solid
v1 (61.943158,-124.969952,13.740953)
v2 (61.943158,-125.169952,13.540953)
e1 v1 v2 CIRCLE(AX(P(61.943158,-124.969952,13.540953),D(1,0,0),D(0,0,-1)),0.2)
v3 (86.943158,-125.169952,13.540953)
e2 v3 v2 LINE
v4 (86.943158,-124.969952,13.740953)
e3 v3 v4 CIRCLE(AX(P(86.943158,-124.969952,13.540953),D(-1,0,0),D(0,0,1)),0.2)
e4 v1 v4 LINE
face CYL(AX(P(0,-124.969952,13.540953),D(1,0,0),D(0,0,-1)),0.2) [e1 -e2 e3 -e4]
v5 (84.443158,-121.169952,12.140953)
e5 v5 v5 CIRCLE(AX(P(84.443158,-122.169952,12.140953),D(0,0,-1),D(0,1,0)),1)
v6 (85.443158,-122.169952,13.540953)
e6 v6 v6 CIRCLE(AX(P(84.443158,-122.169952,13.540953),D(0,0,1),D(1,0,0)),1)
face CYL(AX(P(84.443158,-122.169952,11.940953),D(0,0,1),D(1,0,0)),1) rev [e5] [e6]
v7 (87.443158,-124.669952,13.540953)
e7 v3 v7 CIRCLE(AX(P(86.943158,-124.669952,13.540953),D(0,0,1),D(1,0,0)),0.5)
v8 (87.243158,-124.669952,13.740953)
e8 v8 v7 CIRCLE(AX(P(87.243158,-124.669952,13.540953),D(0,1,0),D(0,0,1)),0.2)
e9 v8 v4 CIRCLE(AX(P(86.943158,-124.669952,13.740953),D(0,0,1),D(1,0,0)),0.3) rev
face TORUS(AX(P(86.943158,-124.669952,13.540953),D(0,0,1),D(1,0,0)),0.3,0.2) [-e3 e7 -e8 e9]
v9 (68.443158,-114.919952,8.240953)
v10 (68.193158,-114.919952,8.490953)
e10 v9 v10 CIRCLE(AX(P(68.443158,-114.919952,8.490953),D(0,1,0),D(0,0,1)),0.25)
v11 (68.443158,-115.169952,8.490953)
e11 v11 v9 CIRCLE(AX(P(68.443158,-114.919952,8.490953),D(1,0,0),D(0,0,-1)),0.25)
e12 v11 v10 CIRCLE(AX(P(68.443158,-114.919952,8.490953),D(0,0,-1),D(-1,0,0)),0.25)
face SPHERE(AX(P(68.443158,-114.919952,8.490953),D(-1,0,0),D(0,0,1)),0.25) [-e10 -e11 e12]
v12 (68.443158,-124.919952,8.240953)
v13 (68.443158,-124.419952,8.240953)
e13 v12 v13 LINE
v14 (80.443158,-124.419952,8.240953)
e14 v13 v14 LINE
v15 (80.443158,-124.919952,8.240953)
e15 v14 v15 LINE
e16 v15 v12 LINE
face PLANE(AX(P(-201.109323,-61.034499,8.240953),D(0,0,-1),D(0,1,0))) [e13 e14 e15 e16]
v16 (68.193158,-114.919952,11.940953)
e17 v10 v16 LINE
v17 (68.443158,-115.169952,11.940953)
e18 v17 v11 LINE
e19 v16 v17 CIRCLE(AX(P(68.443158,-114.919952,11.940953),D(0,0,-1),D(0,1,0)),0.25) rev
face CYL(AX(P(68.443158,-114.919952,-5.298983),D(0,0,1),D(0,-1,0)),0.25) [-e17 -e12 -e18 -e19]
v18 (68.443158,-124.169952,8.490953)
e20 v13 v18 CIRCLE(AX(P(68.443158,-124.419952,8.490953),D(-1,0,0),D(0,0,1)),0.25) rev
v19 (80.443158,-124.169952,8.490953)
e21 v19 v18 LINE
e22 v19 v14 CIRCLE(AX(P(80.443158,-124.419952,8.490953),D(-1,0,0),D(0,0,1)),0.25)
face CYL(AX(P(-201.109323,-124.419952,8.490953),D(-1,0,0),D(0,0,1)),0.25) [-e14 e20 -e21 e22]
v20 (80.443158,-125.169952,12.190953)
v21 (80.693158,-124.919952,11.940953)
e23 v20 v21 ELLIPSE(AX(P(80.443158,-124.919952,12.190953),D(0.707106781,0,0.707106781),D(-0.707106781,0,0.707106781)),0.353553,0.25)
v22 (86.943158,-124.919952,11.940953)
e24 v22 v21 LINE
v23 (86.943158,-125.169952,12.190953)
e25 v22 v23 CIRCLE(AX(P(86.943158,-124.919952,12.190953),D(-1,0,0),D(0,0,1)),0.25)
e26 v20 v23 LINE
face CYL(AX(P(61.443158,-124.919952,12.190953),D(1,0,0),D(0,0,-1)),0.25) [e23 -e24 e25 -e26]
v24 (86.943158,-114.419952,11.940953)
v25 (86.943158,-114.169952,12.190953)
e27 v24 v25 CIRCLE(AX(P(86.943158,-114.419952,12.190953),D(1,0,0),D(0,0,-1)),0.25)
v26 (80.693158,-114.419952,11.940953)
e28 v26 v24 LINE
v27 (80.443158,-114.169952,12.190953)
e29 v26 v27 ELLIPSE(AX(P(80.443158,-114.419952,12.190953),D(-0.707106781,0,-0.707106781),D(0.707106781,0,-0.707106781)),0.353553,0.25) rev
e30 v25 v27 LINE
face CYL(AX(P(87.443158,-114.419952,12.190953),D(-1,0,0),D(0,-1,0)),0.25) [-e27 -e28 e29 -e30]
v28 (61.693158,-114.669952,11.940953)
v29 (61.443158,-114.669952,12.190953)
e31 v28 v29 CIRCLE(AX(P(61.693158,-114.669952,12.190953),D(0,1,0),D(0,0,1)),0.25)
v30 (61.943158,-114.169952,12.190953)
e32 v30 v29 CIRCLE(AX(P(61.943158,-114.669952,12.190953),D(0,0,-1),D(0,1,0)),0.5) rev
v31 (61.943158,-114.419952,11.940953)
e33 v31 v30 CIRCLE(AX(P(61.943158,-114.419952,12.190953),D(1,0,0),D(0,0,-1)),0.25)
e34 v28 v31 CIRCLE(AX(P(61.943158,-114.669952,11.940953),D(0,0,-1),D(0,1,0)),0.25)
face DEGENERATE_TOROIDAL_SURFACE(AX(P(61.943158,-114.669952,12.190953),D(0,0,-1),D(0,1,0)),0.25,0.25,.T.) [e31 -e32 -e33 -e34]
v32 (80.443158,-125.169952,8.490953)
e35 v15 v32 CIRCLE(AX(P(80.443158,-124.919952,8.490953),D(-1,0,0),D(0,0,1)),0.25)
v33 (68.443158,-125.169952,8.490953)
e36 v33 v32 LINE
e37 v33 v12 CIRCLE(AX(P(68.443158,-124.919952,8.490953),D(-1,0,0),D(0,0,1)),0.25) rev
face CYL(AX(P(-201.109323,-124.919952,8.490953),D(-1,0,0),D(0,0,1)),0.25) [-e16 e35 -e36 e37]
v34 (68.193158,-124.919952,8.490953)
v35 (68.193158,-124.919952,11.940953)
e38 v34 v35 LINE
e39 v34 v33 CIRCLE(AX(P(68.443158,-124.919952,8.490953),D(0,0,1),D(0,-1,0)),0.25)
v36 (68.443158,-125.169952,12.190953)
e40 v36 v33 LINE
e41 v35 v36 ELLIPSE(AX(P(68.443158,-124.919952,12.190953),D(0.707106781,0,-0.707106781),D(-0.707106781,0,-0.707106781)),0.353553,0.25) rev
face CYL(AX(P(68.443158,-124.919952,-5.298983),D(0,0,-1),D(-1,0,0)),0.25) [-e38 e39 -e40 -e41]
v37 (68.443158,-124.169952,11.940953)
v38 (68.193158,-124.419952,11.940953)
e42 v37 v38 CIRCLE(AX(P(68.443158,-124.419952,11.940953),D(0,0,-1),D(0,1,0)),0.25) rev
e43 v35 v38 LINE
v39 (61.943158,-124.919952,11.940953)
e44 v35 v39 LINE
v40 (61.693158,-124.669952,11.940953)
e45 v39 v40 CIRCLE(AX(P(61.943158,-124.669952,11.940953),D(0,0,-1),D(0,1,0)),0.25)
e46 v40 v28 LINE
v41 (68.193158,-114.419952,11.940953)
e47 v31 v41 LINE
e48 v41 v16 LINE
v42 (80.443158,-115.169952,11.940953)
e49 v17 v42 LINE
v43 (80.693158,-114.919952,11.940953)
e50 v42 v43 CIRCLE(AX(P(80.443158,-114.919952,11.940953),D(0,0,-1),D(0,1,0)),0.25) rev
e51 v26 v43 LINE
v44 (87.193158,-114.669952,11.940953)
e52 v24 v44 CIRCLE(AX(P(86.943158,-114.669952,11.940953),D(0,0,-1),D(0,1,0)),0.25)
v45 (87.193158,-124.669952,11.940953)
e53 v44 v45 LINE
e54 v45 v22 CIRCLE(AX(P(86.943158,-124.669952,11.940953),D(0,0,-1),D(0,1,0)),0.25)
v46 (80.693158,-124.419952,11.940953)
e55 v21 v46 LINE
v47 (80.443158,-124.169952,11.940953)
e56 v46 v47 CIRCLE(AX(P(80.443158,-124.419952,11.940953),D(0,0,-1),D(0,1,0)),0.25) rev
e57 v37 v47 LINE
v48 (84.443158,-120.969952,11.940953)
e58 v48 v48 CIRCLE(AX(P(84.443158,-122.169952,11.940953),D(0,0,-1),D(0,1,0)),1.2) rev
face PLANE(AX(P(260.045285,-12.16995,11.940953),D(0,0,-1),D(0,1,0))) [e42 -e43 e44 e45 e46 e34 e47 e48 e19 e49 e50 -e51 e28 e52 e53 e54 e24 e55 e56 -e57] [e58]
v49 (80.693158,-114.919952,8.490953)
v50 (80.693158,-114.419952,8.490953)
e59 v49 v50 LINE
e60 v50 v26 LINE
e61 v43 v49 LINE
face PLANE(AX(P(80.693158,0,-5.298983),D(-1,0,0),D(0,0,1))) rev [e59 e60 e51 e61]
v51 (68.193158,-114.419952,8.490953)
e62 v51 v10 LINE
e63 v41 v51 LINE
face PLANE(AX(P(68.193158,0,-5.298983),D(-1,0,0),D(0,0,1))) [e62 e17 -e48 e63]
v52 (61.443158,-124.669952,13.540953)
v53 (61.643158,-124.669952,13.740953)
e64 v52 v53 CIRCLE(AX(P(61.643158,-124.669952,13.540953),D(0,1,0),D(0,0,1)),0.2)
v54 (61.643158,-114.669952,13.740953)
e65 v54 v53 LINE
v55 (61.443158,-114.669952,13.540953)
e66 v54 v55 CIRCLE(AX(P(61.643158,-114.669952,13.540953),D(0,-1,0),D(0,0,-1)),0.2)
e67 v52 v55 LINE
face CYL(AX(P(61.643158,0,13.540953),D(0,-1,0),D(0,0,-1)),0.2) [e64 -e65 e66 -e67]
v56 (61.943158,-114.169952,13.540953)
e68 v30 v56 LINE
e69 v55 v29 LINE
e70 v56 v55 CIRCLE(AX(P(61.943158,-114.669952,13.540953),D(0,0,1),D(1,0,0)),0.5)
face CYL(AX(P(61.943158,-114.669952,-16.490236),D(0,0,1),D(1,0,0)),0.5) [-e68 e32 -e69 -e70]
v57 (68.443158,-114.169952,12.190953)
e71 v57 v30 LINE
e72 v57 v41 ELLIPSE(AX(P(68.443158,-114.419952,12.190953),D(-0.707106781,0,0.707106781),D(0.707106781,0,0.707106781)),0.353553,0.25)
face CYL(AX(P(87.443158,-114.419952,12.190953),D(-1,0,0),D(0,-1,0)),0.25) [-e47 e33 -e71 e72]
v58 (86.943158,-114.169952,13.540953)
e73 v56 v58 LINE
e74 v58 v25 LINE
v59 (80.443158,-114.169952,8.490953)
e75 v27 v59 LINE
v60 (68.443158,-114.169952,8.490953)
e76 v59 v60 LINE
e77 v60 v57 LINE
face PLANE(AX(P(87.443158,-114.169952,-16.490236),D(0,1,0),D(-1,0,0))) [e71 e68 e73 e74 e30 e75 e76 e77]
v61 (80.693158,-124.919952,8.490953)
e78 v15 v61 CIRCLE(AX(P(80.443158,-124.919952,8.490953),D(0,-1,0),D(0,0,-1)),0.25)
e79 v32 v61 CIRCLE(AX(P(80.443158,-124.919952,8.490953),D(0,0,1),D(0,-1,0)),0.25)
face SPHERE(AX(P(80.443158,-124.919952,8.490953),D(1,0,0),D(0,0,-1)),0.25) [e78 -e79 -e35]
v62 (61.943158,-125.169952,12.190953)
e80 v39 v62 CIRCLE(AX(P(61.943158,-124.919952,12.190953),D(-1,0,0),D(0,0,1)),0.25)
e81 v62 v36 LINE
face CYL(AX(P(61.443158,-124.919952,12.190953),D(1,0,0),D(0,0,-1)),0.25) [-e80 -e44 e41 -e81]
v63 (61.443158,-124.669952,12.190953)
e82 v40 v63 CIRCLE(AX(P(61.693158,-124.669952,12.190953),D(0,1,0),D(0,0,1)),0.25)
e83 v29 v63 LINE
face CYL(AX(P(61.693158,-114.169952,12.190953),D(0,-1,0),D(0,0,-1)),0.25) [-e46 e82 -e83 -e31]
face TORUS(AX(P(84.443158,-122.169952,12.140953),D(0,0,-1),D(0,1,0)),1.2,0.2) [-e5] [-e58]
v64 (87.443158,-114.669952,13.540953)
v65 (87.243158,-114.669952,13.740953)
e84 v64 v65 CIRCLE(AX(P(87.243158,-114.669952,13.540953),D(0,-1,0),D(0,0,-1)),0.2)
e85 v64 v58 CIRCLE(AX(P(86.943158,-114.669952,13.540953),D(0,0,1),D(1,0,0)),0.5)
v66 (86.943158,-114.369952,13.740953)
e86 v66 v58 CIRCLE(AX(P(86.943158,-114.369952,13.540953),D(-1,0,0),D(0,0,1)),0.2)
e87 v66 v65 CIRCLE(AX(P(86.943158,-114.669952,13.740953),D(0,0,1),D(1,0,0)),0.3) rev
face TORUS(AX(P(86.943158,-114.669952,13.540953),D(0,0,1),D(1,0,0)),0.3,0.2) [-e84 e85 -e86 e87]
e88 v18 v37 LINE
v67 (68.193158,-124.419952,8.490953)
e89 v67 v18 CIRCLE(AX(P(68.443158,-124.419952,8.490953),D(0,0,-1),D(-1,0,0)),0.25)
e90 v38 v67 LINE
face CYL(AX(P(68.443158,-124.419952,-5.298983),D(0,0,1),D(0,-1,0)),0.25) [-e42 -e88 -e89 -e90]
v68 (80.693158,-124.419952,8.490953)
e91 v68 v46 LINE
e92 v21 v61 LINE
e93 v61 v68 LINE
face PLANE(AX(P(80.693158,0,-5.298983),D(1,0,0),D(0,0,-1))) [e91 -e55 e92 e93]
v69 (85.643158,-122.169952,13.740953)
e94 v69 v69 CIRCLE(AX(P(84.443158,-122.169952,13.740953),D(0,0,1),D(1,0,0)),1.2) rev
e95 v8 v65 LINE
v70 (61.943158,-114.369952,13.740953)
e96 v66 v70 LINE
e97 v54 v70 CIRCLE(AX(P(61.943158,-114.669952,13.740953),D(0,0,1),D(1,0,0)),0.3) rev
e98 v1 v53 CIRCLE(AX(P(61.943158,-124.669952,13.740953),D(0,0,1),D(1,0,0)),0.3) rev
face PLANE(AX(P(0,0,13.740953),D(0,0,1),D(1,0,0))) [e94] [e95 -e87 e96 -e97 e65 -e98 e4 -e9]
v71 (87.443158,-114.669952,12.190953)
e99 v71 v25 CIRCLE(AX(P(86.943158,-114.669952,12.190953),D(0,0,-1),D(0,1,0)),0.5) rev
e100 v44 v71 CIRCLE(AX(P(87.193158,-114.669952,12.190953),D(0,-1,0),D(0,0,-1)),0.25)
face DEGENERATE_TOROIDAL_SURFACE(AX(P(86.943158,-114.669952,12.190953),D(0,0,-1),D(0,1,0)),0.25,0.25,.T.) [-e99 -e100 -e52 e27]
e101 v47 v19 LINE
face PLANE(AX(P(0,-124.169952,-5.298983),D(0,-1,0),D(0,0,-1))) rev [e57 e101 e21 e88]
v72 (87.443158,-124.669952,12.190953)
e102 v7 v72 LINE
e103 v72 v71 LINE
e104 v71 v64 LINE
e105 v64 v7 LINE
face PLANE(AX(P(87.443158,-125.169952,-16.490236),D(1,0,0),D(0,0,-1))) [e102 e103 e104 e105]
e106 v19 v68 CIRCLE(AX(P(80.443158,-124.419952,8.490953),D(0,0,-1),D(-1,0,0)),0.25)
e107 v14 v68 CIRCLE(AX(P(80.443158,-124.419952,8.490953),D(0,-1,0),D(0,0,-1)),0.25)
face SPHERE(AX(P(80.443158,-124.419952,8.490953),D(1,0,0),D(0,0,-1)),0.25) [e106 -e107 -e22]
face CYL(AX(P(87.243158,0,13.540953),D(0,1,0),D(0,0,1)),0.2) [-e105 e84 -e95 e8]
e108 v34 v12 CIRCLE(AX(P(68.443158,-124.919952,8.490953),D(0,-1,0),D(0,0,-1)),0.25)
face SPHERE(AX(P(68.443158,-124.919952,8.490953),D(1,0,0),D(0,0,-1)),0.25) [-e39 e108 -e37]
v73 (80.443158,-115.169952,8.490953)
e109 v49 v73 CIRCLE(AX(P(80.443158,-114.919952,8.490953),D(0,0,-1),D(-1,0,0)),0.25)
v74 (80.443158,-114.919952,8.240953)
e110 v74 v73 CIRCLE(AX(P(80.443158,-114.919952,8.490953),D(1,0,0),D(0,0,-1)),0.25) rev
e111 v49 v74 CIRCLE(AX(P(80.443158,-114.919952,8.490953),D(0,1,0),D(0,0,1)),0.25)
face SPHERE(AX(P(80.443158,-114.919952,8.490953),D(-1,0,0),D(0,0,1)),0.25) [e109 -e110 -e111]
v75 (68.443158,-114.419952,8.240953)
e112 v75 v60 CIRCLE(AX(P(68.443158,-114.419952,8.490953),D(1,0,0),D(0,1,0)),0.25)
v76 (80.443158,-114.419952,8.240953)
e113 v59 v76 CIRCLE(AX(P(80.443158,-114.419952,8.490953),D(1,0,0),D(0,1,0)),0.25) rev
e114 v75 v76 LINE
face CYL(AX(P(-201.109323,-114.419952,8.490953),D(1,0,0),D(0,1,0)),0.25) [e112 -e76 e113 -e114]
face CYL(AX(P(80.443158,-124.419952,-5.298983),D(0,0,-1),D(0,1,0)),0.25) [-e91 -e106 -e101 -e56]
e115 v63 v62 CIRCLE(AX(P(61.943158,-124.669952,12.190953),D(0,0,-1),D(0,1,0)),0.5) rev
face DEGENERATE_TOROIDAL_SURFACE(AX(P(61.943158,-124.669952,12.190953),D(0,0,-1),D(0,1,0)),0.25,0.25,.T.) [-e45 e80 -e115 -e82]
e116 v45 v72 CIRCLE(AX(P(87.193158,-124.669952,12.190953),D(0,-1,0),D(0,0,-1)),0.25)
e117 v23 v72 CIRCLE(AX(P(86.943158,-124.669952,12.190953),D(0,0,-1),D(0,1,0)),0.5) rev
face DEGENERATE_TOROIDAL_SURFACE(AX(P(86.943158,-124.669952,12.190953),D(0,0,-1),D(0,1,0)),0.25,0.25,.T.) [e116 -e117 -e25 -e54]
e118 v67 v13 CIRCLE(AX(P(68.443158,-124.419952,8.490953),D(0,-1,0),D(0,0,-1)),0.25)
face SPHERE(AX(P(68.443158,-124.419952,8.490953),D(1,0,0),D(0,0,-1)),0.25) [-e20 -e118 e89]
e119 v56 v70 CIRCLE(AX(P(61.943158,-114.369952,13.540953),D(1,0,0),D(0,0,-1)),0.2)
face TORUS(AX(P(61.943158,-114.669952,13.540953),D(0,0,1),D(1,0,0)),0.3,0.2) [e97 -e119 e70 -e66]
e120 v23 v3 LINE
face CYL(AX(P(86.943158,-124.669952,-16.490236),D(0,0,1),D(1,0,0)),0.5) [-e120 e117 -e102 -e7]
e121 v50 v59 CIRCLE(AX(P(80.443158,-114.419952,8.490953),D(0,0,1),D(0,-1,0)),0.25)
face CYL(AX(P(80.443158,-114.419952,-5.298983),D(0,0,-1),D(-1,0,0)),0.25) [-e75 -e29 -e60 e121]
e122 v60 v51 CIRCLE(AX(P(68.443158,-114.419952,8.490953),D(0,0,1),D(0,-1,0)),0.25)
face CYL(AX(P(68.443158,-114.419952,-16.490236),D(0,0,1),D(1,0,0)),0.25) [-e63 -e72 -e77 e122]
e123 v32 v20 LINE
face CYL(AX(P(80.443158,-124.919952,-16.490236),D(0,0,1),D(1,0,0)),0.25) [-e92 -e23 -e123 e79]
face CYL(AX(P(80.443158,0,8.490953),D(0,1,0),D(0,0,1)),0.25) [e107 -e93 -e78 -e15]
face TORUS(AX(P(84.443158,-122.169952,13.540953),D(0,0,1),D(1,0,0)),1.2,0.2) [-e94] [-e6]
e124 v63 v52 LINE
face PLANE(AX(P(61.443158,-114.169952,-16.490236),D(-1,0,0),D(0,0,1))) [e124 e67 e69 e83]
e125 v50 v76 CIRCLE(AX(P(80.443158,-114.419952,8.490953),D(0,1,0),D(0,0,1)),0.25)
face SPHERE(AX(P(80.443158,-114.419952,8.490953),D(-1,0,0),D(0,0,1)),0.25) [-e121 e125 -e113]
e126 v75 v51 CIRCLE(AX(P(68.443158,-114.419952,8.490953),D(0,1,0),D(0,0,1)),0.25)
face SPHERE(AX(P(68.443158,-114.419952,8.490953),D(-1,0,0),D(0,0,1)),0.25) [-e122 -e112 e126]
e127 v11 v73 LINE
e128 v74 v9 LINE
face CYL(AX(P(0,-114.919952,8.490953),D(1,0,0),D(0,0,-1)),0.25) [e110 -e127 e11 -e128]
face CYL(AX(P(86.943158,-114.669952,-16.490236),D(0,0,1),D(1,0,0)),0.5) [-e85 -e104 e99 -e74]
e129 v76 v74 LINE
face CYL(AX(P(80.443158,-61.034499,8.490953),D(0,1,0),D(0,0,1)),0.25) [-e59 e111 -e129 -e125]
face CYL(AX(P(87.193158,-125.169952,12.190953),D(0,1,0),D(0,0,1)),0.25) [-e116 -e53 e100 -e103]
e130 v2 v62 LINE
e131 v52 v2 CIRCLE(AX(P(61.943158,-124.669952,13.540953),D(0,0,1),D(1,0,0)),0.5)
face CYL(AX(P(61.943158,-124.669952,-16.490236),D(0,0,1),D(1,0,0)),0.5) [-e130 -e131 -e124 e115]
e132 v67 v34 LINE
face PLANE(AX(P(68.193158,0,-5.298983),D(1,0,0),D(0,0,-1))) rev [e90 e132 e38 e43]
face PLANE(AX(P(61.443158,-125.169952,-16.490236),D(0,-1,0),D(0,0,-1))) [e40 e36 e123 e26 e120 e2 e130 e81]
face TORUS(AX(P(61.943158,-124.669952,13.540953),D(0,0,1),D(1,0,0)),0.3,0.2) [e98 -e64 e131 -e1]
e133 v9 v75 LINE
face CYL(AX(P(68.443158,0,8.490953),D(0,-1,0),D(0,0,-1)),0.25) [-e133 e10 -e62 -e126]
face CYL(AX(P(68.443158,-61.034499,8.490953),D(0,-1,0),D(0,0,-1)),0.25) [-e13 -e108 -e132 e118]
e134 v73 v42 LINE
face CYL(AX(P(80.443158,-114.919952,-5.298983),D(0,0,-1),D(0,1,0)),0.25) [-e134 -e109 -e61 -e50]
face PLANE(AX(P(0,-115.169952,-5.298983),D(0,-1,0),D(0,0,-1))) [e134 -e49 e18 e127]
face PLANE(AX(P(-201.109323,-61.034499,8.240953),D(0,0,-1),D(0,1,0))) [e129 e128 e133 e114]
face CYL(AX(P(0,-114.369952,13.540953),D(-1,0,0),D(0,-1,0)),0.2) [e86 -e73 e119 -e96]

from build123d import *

# Parameters (mm, degrees)
SKETCH1_W           = 26
SKETCH1_H           = 11
BOSS_EXTRUDE1_DEPTH = 1.8
FILLET1_R           = 0.2
SKETCH2_R           = 1
CUT_EXTRUDE1_DEPTH  = 153.699256387
FILLET2_R           = 0.5
FILLET3_R           = 0.2
SKETCH4_W           = 12.5
SKETCH4_H           = 1
BOSS_EXTRUDE2_DEPTH = 3.7
FILLET4_R           = 0.25
FILLET5_R           = 0.25


with BuildPart() as part:
    # Sketch1 → Boss-Extrude1 (new body)
    with BuildSketch(Plane.XY.offset(13.74095281)):
        with Locations((74.443158301, -119.669952335)):
            Rectangle(SKETCH1_W, SKETCH1_H)
    extrude(amount=-BOSS_EXTRUDE1_DEPTH)

    # Fillet1
    fillet1_edges = [part.edges().sort_by_distance(p)[0] for p in [
        (87.443158301, -119.669952335, 13.74095281),
        (74.443158301, -114.169952335, 13.74095281),
        (61.443158301, -119.669952335, 13.74095281),
        (74.443158301, -125.169952335, 13.74095281),
    ]]
    fillet(fillet1_edges, radius=FILLET1_R)

    # Sketch2 → Cut-Extrude1 (cut, through all)
    with BuildSketch(Plane.XY.offset(13.74095281)):
        with Locations((84.443158301, -122.169952335)):
            Circle(SKETCH2_R)
    extrude(amount=-CUT_EXTRUDE1_DEPTH, mode=Mode.SUBTRACT)

    # Fillet2
    # the kernel refuses this fillet: 0.5 mm, written as the material it takes off along each edge
    with BuildSketch(Plane(origin=(86.943158301, -124.669952335, 13.74095281), x_dir=(0, -1, 0), z_dir=(-1, 0, 0))) as fillet2_piece_1:
        with BuildLine():
            CenterArc((0.3, -0.2), 0.2, 0, 90)
            Line((0.5, -0.2), (0.5, 0))
            Line((0.5, 0), (0.3, 0))
        make_face()
    revolve(axis=Axis((86.943158301, -124.669952335, 13.74095281), (0, 0, 1)), revolution_arc=90, mode=Mode.SUBTRACT)
    with BuildSketch(Plane(origin=(61.943158301, -124.669952335, 13.74095281), x_dir=(-1, 0, 0), z_dir=(0, 1, 0))) as fillet2_piece_2:
        with BuildLine():
            CenterArc((0.3, -0.2), 0.2, 0, 90)
            Line((0.5, -0.2), (0.5, 0))
            Line((0.5, 0), (0.3, 0))
        make_face()
    revolve(axis=Axis((61.943158301, -124.669952335, 13.74095281), (0, 0, 1)), revolution_arc=90, mode=Mode.SUBTRACT)
    with BuildSketch(Plane(origin=(86.943158301, -114.669952335, 13.74095281), x_dir=(1, 0, 0), z_dir=(0, -1, 0))) as fillet2_piece_3:
        with BuildLine():
            CenterArc((0.3, -0.2), 0.2, 0, 90)
            Line((0.5, -0.2), (0.5, 0))
            Line((0.5, 0), (0.3, 0))
        make_face()
    revolve(axis=Axis((86.943158301, -114.669952335, 13.74095281), (0, 0, 1)), revolution_arc=90, mode=Mode.SUBTRACT)
    with BuildSketch(Plane(origin=(61.943158301, -114.669952335, 13.74095281), x_dir=(0, 1, 0), z_dir=(1, 0, 0))) as fillet2_piece_4:
        with BuildLine():
            CenterArc((0.3, -0.2), 0.2, 0, 90)
            Line((0.5, -0.2), (0.5, 0))
            Line((0.5, 0), (0.3, 0))
        make_face()
    revolve(axis=Axis((61.943158301, -114.669952335, 13.74095281), (0, 0, 1)), revolution_arc=90, mode=Mode.SUBTRACT)
    with BuildSketch(Plane(origin=(87.443158301, -125.169952335, 13.74095281), x_dir=(-1, 0, 0), z_dir=(0, 0, -1)), Plane(origin=(87.443158301, -114.169952335, 13.74095281), x_dir=(0, -1, 0), z_dir=(0, 0, -1))) as fillet2_piece_5:
        with BuildLine():
            CenterArc((FILLET2_R, FILLET2_R), FILLET2_R, 180, 90)
            Line((0, FILLET2_R), (0, 0))
            Line((0, 0), (FILLET2_R, 0))
        make_face()
    extrude(amount=3.05, mode=Mode.SUBTRACT)
    with BuildSketch(Plane(origin=(61.443158301, -114.169952335, 13.74095281), x_dir=(0, -1, 0), z_dir=(0, 0, -1)), Plane(origin=(61.443158301, -125.169952335, 13.74095281), x_dir=(1, 0, 0), z_dir=(0, 0, -1))) as fillet2_piece_6:
        with BuildLine():
            CenterArc((FILLET2_R, -FILLET2_R), FILLET2_R, 90, 90)
            Line((0, -FILLET2_R), (0, 0))
            Line((0, 0), (FILLET2_R, 0))
        make_face()
    extrude(amount=3.05, mode=Mode.SUBTRACT)

    # Fillet3
    fillet3_edges = [part.edges().sort_by_distance(p)[0] for p in [
        (83.443158301, -122.169952335, 11.94095281),
        (83.443158301, -122.169952335, 13.74095281),
    ]]
    fillet(fillet3_edges, radius=FILLET3_R)

    # Sketch4 → Boss-Extrude2 (add)
    with BuildSketch(Plane(origin=(0, 0, 11.94095281), x_dir=(-1, 0, 0), z_dir=(0, 0, -1))):
        with Locations((-74.443158301, -124.669952335)):
            Rectangle(SKETCH4_W, SKETCH4_H)
        with Locations((-74.443158301, -114.669952335)):
            Rectangle(SKETCH4_W, SKETCH4_H)
    extrude(amount=BOSS_EXTRUDE2_DEPTH)

    # Fillet4
    fillet4_edges = [part.edges().sort_by_distance(p)[0] for p in [
        (61.443158301, -119.669952335, 11.94095281),
        (65.068158301, -125.169952335, 11.94095281),
        (83.818158301, -114.169952335, 11.94095281),
        (87.443158301, -119.669952335, 11.94095281),
        (87.296711691, -125.023505725, 11.94095281),
        (87.296711691, -114.316398944, 11.94095281),
        (61.58960491, -114.316398944, 11.94095281),
        (61.58960491, -125.023505725, 11.94095281),
        (83.818158301, -125.169952335, 11.94095281),
        (65.068158301, -114.169952335, 11.94095281),
        (74.443158301, -125.169952335, 8.24095281),
        (74.443158301, -124.169952335, 8.24095281),
        (74.443158301, -114.169952335, 8.24095281),
        (74.443158301, -115.169952335, 8.24095281),
    ]]
    fillet(fillet4_edges, radius=FILLET4_R)

    # Fillet5
    fillet5_edges = [part.edges().sort_by_distance(p)[0] for p in [
        (68.193158301, -114.169952335, 10.34095281),
        (68.193158301, -114.243175639, 8.314176115),
        (68.193158301, -115.169952335, 10.21595281),
        (68.193158301, -115.09672903, 8.314176115),
        (68.193158301, -125.169952335, 10.34095281),
        (68.193158301, -125.09672903, 8.314176115),
        (68.193158301, -124.169952335, 10.21595281),
        (68.193158301, -124.243175639, 8.314176115),
        (80.693158301, -125.169952335, 10.34095281),
        (80.693158301, -125.09672903, 8.314176115),
        (80.693158301, -124.169952335, 10.21595281),
        (80.693158301, -124.243175639, 8.314176115),
        (80.693158301, -114.169952335, 10.34095281),
        (80.693158301, -114.243175639, 8.314176115),
        (80.693158301, -115.169952335, 10.21595281),
        (80.693158301, -115.09672903, 8.314176115),
        (68.193158301, -114.669952335, 8.24095281),
        (68.193158301, -124.669952335, 8.24095281),
        (80.693158301, -124.669952335, 8.24095281),
        (80.693158301, -114.669952335, 8.24095281),
    ]]
    fillet(fillet5_edges, radius=FILLET5_R)


solid = part.part
